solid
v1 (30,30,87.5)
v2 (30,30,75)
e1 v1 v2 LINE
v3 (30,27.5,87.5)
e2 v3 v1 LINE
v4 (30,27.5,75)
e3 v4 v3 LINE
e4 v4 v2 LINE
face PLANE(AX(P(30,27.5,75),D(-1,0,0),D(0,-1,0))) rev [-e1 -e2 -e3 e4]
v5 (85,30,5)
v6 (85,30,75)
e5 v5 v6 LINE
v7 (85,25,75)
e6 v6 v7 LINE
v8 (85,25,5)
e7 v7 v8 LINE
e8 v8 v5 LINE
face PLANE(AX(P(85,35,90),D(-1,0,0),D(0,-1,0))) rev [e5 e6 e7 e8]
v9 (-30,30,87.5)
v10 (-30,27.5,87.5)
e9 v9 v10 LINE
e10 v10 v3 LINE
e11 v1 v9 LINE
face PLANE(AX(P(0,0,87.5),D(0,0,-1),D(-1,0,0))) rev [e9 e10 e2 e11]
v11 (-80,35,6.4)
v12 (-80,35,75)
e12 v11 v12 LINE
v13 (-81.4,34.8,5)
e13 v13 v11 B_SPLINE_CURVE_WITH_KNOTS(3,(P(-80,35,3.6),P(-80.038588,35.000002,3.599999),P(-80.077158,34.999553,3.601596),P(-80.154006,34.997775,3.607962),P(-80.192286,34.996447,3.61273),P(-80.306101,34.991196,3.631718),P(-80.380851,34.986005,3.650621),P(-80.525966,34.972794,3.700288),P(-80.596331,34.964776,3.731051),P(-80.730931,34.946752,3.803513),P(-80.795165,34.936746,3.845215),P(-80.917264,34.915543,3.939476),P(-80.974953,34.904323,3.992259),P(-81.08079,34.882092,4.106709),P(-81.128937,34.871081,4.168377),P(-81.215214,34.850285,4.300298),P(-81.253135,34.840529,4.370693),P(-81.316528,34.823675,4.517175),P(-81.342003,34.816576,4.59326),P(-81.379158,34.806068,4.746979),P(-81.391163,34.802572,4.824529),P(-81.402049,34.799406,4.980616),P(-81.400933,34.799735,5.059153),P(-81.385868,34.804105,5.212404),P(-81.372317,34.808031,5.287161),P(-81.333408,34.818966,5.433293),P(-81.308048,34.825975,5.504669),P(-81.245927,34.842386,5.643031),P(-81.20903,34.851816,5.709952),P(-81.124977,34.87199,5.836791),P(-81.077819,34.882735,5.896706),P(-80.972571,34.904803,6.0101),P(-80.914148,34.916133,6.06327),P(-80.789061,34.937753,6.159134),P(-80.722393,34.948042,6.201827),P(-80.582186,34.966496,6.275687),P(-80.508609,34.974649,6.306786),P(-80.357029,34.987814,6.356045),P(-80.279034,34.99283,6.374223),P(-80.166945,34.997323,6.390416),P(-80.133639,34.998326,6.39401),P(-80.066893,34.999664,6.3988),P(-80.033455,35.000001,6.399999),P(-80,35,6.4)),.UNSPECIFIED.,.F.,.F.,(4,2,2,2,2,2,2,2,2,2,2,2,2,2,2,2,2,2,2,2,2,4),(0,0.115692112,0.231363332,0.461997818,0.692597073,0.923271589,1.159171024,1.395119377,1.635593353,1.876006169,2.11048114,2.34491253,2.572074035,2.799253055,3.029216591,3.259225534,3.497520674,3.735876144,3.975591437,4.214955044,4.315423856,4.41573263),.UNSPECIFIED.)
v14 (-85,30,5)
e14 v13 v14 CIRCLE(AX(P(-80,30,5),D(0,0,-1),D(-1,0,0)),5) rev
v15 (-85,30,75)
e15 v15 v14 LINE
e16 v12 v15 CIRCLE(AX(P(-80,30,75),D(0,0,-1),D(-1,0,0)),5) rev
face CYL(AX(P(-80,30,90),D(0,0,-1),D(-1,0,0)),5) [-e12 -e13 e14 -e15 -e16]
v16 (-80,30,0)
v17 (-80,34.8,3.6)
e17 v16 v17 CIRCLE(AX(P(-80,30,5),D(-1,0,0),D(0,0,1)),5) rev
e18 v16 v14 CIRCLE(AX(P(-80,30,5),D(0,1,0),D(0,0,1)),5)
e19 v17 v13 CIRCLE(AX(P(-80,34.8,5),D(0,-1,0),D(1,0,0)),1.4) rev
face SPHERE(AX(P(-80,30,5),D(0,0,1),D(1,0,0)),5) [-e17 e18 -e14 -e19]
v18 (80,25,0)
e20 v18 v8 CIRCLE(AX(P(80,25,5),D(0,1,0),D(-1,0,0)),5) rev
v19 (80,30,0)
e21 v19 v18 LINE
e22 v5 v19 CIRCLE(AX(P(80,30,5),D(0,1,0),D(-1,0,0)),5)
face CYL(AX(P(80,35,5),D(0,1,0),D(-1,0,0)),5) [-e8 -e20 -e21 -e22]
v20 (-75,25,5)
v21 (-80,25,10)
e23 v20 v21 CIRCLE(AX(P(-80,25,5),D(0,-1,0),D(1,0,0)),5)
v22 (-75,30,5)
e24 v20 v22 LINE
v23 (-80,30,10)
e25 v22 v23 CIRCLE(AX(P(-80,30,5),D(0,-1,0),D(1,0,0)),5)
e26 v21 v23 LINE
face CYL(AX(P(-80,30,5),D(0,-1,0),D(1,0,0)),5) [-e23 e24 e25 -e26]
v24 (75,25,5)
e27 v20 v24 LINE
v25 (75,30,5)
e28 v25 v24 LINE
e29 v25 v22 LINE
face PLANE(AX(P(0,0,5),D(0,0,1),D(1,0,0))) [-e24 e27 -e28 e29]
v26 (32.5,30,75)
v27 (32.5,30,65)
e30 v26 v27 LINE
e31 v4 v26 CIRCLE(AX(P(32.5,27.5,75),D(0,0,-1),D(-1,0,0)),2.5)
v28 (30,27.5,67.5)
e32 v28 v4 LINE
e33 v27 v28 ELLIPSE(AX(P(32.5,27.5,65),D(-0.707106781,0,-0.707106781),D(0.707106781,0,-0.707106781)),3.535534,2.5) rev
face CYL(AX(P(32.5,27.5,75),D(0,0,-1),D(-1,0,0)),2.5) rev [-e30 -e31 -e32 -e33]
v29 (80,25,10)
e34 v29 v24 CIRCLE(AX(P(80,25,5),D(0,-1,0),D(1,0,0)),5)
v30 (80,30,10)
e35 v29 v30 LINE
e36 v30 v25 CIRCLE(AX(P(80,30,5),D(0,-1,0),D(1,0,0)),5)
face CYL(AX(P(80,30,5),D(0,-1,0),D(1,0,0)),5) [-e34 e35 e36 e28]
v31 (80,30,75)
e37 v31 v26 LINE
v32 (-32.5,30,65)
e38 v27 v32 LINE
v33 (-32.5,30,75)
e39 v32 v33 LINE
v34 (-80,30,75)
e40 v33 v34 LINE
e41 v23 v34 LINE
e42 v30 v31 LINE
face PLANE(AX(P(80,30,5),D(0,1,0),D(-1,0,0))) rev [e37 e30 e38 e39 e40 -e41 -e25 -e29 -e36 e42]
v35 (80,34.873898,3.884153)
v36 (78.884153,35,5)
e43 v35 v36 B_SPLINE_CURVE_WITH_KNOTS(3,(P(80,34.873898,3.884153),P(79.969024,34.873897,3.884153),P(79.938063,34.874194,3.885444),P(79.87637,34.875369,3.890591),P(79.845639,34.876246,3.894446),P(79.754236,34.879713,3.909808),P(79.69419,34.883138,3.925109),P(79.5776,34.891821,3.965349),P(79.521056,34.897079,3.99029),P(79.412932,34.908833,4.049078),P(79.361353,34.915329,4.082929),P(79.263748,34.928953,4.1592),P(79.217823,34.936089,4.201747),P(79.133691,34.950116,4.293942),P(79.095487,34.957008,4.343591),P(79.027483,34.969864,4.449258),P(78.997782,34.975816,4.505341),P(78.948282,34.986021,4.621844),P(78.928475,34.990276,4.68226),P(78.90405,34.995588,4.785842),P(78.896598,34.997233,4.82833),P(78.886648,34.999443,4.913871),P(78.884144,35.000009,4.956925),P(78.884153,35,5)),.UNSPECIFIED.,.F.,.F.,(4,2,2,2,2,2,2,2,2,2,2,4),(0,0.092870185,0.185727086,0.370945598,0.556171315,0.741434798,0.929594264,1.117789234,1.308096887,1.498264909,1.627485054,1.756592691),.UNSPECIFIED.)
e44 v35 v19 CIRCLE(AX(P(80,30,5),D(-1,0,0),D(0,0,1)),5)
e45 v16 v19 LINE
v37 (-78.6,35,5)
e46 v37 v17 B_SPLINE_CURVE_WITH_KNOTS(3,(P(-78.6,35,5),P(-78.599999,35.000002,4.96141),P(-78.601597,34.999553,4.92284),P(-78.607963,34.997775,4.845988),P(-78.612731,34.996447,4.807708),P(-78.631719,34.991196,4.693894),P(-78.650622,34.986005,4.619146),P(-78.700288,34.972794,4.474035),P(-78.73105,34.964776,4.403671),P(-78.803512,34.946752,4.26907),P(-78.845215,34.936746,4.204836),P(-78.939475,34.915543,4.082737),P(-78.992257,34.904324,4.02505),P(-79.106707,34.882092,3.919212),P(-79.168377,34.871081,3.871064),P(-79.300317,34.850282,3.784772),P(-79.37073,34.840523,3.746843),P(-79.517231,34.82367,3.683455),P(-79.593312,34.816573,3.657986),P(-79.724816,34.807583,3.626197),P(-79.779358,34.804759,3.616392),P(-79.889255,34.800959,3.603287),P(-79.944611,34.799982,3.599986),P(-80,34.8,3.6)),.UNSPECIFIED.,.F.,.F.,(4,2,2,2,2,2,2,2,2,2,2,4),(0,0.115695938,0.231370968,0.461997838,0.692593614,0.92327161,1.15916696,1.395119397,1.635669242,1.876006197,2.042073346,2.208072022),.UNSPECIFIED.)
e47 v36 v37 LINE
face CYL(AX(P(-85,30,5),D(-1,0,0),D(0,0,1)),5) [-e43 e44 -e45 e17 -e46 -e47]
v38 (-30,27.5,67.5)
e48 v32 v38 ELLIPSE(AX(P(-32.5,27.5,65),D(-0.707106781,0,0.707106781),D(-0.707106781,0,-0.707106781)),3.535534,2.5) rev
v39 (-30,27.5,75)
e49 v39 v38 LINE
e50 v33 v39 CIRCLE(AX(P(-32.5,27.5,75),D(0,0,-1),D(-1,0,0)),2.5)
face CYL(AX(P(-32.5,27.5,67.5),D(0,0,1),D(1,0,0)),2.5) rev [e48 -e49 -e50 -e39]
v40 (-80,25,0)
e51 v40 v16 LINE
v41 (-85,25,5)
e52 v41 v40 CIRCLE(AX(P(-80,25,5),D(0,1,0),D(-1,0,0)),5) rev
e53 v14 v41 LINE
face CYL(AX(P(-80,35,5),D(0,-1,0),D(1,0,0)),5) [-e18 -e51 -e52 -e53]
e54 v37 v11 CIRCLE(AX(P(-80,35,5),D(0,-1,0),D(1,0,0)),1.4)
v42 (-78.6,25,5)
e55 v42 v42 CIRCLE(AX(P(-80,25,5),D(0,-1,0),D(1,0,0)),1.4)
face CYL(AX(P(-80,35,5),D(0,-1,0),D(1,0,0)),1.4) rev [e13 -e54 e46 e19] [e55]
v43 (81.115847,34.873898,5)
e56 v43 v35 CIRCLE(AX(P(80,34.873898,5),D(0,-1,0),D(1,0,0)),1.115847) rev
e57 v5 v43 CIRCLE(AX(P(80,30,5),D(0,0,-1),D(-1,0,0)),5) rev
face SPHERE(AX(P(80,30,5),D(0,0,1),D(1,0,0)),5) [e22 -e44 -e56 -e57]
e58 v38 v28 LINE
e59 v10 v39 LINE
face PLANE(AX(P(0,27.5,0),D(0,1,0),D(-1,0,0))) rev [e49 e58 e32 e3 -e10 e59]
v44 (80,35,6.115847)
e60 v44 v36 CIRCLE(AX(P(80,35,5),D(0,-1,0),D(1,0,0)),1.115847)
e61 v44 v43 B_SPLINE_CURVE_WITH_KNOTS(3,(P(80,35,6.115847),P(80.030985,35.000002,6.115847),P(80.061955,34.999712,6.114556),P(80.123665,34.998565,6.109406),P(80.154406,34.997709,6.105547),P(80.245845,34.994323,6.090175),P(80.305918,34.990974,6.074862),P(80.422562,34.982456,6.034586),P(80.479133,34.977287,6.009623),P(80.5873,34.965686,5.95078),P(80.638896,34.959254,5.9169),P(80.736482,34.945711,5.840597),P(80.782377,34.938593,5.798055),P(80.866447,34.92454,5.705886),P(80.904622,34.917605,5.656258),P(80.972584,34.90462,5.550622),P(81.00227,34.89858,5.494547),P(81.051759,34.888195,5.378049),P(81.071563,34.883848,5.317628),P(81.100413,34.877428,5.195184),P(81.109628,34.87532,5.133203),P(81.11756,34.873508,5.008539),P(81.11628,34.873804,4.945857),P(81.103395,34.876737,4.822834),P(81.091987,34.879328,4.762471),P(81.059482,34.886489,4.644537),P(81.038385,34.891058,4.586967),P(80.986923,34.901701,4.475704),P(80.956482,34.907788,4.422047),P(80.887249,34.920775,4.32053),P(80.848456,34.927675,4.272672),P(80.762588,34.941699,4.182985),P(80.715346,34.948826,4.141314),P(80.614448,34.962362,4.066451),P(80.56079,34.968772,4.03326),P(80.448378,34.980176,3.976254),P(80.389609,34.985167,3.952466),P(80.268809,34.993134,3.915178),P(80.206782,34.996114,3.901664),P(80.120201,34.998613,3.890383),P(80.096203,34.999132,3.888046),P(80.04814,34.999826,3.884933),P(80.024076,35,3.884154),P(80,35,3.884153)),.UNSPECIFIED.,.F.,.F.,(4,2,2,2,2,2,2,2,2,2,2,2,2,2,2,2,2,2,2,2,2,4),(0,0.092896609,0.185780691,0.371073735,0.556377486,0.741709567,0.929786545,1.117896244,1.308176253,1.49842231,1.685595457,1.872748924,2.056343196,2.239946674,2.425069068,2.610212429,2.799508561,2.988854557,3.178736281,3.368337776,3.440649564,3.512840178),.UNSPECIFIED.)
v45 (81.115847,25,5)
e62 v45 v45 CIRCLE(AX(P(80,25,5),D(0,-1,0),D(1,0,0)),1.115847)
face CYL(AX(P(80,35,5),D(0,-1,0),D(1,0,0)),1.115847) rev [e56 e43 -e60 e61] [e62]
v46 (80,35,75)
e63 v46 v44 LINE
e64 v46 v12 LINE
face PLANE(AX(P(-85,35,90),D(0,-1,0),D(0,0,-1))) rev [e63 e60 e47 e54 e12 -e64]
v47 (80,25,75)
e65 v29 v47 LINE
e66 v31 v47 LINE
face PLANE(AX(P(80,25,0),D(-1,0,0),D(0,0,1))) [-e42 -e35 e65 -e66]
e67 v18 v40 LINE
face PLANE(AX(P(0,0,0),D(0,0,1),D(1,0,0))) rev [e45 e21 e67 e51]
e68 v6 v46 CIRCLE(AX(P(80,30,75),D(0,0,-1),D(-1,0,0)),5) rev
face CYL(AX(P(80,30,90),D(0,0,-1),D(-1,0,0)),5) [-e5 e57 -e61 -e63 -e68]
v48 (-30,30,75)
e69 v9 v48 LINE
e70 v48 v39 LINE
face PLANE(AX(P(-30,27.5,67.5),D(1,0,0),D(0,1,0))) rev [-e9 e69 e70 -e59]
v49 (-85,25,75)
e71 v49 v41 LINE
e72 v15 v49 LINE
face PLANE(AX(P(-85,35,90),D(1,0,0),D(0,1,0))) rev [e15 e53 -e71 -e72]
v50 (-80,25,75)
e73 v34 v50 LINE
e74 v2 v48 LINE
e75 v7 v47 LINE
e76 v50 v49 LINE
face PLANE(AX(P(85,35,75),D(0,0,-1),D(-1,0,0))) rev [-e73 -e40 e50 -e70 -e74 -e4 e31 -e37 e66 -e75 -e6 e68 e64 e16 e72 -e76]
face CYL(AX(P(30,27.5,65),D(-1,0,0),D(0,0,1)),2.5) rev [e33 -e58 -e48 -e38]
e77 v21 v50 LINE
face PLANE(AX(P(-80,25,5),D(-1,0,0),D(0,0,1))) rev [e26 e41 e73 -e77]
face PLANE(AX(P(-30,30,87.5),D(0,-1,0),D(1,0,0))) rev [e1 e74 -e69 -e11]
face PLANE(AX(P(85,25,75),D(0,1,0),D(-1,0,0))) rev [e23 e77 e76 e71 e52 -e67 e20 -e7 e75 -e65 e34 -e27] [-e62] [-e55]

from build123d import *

# Parameters (mm, degrees)
SKETCH1_W           = 170
SKETCH1_H           = 70
BOSS_EXTRUDE1_DEPTH = 90
FILLET2_R           = 5
SKETCH5_R           = 1.4
CUT_EXTRUDE2_DEPTH  = 12
CUT_EXTRUDE3_DEPTH  = 170
SKETCH7_W           = 158.942349138
SKETCH7_H           = 5
CUT_EXTRUDE4_DEPTH  = 70
SKETCH9_W           = 1.057650862
SKETCH9_H           = 5
SKETCH9_W_2         = 2.044997
CUT_EXTRUDE5_DEPTH  = 70
SKETCH12_W          = 5
SKETCH12_H          = 5
BOSS_EXTRUDE2_DEPTH = 75
SKETCH13_R          = 5
BOSS_EXTRUDE4_DEPTH = 5
SKETCH14_R          = 1.4
SKETCH14_R_2        = 1.115846917
CUT_EXTRUDE6_DEPTH  = 10
FILLET3_R           = 5
BOSS_EXTRUDE5_DEPTH = 2.5
SKETCH16_W          = 60
SKETCH16_H          = 2.5
BOSS_EXTRUDE6_DEPTH = 12.5
FILLET4_R           = 2.5


# Some blends are built 0.0001 mm under size
with BuildPart() as part:
    # Sketch1 → Boss-Extrude1 (new body)
    with BuildSketch(Plane.XY):
        Rectangle(SKETCH1_W, SKETCH1_H)
    extrude(amount=BOSS_EXTRUDE1_DEPTH)

    # Fillet2
    fillet2_edges = [part.edges().sort_by_distance(p)[0] for p in [
        (85, -35, 45),
        (-85, -35, 45),
        (-85, 35, 45),
        (85, 35, 45),
    ]]
    fillet(fillet2_edges, radius=FILLET2_R)

    # Sketch5 → Cut-Extrude2 (cut)
    with BuildSketch(Plane.XY.offset(90)):
        with Locations((-80, 30)):
            Circle(SKETCH5_R)
        with Locations((-80, -30)):
            Circle(SKETCH5_R)
        with Locations((80, 30)):
            Circle(SKETCH5_R)
        with Locations((80, -30)):
            Circle(SKETCH5_R)
    extrude(amount=-CUT_EXTRUDE2_DEPTH, mode=Mode.SUBTRACT)

    # Sketch6 → Cut-Extrude3 (cut)
    with BuildSketch(Plane.ZY.offset(85)):
        Polygon((0, 25), (0, -35), (90, -35), (90, 35), (75, 35), (75, 25), align=None)
    extrude(amount=-CUT_EXTRUDE3_DEPTH, mode=Mode.SUBTRACT)

    # Sketch7 → Cut-Extrude4 (cut)
    with BuildSketch(Plane.XY.offset(75)):
        with Locations((0.528825431, 27.5)):
            Rectangle(SKETCH7_W, SKETCH7_H)
    extrude(amount=-CUT_EXTRUDE4_DEPTH, mode=Mode.SUBTRACT)

    # Sketch9 → Cut-Extrude5 (cut)
    with BuildSketch(Plane.XY.offset(75)):
        with Locations((-79.471174569, 27.5)):
            Rectangle(SKETCH9_W, SKETCH9_H)
        with Locations((81.0224985, 27.5)):
            Rectangle(SKETCH9_W_2, SKETCH9_H)
    extrude(amount=-CUT_EXTRUDE5_DEPTH, mode=Mode.SUBTRACT)

    # Sketch12 → Boss-Extrude2 (add)
    with BuildSketch(Plane.XY.offset(75)):
        with Locations((82.5, 27.5)):
            Rectangle(SKETCH12_W, SKETCH12_H)
    extrude(amount=-BOSS_EXTRUDE2_DEPTH)

    # Sketch13 → Boss-Extrude4 (add)
    with BuildSketch(Plane(origin=(0, 25, 0), x_dir=(-1, 0, 0), z_dir=(0, -1, 0))):
        with Locations((-80, -5)):
            Circle(SKETCH13_R)
        with Locations((80, -5)):
            Circle(SKETCH13_R)
    extrude(amount=-BOSS_EXTRUDE4_DEPTH)

    # Sketch14 → Cut-Extrude6 (cut)
    with BuildSketch(Plane.XZ.offset(-25)):
        with Locations((-80, 5)):
            Circle(SKETCH14_R)
        with Locations((80, 5)):
            Circle(SKETCH14_R_2)
    extrude(amount=-CUT_EXTRUDE6_DEPTH, mode=Mode.SUBTRACT)

    # Fillet3
    # the kernel refuses this fillet: 5 mm, written as the material it takes off along each edge
    with BuildSketch(Plane(origin=(-80, 35, 0), x_dir=(0, 0, 1), z_dir=(1, 0, 0))) as fillet3_piece_1:
        with BuildLine():
            CenterArc((FILLET3_R, FILLET3_R), FILLET3_R, 180, 90)
            Line((0, FILLET3_R), (0, 0))
            Line((0, 0), (FILLET3_R, 0))
        make_face()
    extrude(amount=160, mode=Mode.SUBTRACT)
    with BuildSketch(Plane(origin=(80, 30, 0), x_dir=(0, 1, 0), z_dir=(-1, 0, 0))) as fillet3_piece_2:
        with BuildLine():
            CenterArc((5 - FILLET3_R, -FILLET3_R), FILLET3_R, 0, 90)
            Line((5, -FILLET3_R), (5, 0))
            Line((5, 0), (5 - FILLET3_R, 0))
        make_face()
    revolve(axis=Axis((80, 30, 0), (0, 0, -1)), revolution_arc=90, mode=Mode.SUBTRACT)
    with BuildSketch(Plane(origin=(85, 30, 0), x_dir=(-1, 0, 0), z_dir=(0, -1, 0)), Plane(origin=(-85, 12.5, 0), x_dir=(1, 0, 0), z_dir=(0, 1, 0))) as fillet3_piece_3:
        with BuildLine():
            CenterArc((FILLET3_R, -FILLET3_R), FILLET3_R, 90, 90)
            Line((0, -FILLET3_R), (0, 0))
            Line((0, 0), (FILLET3_R, 0))
        make_face()
    extrude(amount=17.5, mode=Mode.SUBTRACT)
    with BuildSketch(Plane(origin=(-80, 30, 0), x_dir=(0, 1, 0), z_dir=(1, 0, 0))) as fillet3_piece_4:
        with BuildLine():
            CenterArc((5 - FILLET3_R, FILLET3_R), FILLET3_R, 270, 90)
            Line((5, FILLET3_R), (5, 0))
            Line((5, 0), (5 - FILLET3_R, 0))
        make_face()
    revolve(axis=Axis((-80, 30, 0), (0, 0, 1)), revolution_arc=90, mode=Mode.SUBTRACT)

    # Sketch15 → Boss-Extrude5 (add)
    with BuildSketch(Plane.XZ.offset(-30)):
        Polygon((0, 75), (30, 75), (30, 67.5), (-30, 67.5), (-30, 75), align=None)
    extrude(amount=BOSS_EXTRUDE5_DEPTH)

    # Sketch16 → Boss-Extrude6 (add)
    with BuildSketch(Plane.XY.offset(75)):
        with Locations((0, 28.75)):
            Rectangle(SKETCH16_W, SKETCH16_H)
    extrude(amount=BOSS_EXTRUDE6_DEPTH)

    # Fillet4
    fillet4_edges = [part.edges().sort_by_distance(p)[0] for p in [
        (-30, 30, 71.25),
        (0, 30, 67.5),
        (30, 30, 71.25),
    ]]
    fillet(fillet4_edges, radius=FILLET4_R - 0.0001)  # a hair under: the kernel refuses the full size


solid = part.part
